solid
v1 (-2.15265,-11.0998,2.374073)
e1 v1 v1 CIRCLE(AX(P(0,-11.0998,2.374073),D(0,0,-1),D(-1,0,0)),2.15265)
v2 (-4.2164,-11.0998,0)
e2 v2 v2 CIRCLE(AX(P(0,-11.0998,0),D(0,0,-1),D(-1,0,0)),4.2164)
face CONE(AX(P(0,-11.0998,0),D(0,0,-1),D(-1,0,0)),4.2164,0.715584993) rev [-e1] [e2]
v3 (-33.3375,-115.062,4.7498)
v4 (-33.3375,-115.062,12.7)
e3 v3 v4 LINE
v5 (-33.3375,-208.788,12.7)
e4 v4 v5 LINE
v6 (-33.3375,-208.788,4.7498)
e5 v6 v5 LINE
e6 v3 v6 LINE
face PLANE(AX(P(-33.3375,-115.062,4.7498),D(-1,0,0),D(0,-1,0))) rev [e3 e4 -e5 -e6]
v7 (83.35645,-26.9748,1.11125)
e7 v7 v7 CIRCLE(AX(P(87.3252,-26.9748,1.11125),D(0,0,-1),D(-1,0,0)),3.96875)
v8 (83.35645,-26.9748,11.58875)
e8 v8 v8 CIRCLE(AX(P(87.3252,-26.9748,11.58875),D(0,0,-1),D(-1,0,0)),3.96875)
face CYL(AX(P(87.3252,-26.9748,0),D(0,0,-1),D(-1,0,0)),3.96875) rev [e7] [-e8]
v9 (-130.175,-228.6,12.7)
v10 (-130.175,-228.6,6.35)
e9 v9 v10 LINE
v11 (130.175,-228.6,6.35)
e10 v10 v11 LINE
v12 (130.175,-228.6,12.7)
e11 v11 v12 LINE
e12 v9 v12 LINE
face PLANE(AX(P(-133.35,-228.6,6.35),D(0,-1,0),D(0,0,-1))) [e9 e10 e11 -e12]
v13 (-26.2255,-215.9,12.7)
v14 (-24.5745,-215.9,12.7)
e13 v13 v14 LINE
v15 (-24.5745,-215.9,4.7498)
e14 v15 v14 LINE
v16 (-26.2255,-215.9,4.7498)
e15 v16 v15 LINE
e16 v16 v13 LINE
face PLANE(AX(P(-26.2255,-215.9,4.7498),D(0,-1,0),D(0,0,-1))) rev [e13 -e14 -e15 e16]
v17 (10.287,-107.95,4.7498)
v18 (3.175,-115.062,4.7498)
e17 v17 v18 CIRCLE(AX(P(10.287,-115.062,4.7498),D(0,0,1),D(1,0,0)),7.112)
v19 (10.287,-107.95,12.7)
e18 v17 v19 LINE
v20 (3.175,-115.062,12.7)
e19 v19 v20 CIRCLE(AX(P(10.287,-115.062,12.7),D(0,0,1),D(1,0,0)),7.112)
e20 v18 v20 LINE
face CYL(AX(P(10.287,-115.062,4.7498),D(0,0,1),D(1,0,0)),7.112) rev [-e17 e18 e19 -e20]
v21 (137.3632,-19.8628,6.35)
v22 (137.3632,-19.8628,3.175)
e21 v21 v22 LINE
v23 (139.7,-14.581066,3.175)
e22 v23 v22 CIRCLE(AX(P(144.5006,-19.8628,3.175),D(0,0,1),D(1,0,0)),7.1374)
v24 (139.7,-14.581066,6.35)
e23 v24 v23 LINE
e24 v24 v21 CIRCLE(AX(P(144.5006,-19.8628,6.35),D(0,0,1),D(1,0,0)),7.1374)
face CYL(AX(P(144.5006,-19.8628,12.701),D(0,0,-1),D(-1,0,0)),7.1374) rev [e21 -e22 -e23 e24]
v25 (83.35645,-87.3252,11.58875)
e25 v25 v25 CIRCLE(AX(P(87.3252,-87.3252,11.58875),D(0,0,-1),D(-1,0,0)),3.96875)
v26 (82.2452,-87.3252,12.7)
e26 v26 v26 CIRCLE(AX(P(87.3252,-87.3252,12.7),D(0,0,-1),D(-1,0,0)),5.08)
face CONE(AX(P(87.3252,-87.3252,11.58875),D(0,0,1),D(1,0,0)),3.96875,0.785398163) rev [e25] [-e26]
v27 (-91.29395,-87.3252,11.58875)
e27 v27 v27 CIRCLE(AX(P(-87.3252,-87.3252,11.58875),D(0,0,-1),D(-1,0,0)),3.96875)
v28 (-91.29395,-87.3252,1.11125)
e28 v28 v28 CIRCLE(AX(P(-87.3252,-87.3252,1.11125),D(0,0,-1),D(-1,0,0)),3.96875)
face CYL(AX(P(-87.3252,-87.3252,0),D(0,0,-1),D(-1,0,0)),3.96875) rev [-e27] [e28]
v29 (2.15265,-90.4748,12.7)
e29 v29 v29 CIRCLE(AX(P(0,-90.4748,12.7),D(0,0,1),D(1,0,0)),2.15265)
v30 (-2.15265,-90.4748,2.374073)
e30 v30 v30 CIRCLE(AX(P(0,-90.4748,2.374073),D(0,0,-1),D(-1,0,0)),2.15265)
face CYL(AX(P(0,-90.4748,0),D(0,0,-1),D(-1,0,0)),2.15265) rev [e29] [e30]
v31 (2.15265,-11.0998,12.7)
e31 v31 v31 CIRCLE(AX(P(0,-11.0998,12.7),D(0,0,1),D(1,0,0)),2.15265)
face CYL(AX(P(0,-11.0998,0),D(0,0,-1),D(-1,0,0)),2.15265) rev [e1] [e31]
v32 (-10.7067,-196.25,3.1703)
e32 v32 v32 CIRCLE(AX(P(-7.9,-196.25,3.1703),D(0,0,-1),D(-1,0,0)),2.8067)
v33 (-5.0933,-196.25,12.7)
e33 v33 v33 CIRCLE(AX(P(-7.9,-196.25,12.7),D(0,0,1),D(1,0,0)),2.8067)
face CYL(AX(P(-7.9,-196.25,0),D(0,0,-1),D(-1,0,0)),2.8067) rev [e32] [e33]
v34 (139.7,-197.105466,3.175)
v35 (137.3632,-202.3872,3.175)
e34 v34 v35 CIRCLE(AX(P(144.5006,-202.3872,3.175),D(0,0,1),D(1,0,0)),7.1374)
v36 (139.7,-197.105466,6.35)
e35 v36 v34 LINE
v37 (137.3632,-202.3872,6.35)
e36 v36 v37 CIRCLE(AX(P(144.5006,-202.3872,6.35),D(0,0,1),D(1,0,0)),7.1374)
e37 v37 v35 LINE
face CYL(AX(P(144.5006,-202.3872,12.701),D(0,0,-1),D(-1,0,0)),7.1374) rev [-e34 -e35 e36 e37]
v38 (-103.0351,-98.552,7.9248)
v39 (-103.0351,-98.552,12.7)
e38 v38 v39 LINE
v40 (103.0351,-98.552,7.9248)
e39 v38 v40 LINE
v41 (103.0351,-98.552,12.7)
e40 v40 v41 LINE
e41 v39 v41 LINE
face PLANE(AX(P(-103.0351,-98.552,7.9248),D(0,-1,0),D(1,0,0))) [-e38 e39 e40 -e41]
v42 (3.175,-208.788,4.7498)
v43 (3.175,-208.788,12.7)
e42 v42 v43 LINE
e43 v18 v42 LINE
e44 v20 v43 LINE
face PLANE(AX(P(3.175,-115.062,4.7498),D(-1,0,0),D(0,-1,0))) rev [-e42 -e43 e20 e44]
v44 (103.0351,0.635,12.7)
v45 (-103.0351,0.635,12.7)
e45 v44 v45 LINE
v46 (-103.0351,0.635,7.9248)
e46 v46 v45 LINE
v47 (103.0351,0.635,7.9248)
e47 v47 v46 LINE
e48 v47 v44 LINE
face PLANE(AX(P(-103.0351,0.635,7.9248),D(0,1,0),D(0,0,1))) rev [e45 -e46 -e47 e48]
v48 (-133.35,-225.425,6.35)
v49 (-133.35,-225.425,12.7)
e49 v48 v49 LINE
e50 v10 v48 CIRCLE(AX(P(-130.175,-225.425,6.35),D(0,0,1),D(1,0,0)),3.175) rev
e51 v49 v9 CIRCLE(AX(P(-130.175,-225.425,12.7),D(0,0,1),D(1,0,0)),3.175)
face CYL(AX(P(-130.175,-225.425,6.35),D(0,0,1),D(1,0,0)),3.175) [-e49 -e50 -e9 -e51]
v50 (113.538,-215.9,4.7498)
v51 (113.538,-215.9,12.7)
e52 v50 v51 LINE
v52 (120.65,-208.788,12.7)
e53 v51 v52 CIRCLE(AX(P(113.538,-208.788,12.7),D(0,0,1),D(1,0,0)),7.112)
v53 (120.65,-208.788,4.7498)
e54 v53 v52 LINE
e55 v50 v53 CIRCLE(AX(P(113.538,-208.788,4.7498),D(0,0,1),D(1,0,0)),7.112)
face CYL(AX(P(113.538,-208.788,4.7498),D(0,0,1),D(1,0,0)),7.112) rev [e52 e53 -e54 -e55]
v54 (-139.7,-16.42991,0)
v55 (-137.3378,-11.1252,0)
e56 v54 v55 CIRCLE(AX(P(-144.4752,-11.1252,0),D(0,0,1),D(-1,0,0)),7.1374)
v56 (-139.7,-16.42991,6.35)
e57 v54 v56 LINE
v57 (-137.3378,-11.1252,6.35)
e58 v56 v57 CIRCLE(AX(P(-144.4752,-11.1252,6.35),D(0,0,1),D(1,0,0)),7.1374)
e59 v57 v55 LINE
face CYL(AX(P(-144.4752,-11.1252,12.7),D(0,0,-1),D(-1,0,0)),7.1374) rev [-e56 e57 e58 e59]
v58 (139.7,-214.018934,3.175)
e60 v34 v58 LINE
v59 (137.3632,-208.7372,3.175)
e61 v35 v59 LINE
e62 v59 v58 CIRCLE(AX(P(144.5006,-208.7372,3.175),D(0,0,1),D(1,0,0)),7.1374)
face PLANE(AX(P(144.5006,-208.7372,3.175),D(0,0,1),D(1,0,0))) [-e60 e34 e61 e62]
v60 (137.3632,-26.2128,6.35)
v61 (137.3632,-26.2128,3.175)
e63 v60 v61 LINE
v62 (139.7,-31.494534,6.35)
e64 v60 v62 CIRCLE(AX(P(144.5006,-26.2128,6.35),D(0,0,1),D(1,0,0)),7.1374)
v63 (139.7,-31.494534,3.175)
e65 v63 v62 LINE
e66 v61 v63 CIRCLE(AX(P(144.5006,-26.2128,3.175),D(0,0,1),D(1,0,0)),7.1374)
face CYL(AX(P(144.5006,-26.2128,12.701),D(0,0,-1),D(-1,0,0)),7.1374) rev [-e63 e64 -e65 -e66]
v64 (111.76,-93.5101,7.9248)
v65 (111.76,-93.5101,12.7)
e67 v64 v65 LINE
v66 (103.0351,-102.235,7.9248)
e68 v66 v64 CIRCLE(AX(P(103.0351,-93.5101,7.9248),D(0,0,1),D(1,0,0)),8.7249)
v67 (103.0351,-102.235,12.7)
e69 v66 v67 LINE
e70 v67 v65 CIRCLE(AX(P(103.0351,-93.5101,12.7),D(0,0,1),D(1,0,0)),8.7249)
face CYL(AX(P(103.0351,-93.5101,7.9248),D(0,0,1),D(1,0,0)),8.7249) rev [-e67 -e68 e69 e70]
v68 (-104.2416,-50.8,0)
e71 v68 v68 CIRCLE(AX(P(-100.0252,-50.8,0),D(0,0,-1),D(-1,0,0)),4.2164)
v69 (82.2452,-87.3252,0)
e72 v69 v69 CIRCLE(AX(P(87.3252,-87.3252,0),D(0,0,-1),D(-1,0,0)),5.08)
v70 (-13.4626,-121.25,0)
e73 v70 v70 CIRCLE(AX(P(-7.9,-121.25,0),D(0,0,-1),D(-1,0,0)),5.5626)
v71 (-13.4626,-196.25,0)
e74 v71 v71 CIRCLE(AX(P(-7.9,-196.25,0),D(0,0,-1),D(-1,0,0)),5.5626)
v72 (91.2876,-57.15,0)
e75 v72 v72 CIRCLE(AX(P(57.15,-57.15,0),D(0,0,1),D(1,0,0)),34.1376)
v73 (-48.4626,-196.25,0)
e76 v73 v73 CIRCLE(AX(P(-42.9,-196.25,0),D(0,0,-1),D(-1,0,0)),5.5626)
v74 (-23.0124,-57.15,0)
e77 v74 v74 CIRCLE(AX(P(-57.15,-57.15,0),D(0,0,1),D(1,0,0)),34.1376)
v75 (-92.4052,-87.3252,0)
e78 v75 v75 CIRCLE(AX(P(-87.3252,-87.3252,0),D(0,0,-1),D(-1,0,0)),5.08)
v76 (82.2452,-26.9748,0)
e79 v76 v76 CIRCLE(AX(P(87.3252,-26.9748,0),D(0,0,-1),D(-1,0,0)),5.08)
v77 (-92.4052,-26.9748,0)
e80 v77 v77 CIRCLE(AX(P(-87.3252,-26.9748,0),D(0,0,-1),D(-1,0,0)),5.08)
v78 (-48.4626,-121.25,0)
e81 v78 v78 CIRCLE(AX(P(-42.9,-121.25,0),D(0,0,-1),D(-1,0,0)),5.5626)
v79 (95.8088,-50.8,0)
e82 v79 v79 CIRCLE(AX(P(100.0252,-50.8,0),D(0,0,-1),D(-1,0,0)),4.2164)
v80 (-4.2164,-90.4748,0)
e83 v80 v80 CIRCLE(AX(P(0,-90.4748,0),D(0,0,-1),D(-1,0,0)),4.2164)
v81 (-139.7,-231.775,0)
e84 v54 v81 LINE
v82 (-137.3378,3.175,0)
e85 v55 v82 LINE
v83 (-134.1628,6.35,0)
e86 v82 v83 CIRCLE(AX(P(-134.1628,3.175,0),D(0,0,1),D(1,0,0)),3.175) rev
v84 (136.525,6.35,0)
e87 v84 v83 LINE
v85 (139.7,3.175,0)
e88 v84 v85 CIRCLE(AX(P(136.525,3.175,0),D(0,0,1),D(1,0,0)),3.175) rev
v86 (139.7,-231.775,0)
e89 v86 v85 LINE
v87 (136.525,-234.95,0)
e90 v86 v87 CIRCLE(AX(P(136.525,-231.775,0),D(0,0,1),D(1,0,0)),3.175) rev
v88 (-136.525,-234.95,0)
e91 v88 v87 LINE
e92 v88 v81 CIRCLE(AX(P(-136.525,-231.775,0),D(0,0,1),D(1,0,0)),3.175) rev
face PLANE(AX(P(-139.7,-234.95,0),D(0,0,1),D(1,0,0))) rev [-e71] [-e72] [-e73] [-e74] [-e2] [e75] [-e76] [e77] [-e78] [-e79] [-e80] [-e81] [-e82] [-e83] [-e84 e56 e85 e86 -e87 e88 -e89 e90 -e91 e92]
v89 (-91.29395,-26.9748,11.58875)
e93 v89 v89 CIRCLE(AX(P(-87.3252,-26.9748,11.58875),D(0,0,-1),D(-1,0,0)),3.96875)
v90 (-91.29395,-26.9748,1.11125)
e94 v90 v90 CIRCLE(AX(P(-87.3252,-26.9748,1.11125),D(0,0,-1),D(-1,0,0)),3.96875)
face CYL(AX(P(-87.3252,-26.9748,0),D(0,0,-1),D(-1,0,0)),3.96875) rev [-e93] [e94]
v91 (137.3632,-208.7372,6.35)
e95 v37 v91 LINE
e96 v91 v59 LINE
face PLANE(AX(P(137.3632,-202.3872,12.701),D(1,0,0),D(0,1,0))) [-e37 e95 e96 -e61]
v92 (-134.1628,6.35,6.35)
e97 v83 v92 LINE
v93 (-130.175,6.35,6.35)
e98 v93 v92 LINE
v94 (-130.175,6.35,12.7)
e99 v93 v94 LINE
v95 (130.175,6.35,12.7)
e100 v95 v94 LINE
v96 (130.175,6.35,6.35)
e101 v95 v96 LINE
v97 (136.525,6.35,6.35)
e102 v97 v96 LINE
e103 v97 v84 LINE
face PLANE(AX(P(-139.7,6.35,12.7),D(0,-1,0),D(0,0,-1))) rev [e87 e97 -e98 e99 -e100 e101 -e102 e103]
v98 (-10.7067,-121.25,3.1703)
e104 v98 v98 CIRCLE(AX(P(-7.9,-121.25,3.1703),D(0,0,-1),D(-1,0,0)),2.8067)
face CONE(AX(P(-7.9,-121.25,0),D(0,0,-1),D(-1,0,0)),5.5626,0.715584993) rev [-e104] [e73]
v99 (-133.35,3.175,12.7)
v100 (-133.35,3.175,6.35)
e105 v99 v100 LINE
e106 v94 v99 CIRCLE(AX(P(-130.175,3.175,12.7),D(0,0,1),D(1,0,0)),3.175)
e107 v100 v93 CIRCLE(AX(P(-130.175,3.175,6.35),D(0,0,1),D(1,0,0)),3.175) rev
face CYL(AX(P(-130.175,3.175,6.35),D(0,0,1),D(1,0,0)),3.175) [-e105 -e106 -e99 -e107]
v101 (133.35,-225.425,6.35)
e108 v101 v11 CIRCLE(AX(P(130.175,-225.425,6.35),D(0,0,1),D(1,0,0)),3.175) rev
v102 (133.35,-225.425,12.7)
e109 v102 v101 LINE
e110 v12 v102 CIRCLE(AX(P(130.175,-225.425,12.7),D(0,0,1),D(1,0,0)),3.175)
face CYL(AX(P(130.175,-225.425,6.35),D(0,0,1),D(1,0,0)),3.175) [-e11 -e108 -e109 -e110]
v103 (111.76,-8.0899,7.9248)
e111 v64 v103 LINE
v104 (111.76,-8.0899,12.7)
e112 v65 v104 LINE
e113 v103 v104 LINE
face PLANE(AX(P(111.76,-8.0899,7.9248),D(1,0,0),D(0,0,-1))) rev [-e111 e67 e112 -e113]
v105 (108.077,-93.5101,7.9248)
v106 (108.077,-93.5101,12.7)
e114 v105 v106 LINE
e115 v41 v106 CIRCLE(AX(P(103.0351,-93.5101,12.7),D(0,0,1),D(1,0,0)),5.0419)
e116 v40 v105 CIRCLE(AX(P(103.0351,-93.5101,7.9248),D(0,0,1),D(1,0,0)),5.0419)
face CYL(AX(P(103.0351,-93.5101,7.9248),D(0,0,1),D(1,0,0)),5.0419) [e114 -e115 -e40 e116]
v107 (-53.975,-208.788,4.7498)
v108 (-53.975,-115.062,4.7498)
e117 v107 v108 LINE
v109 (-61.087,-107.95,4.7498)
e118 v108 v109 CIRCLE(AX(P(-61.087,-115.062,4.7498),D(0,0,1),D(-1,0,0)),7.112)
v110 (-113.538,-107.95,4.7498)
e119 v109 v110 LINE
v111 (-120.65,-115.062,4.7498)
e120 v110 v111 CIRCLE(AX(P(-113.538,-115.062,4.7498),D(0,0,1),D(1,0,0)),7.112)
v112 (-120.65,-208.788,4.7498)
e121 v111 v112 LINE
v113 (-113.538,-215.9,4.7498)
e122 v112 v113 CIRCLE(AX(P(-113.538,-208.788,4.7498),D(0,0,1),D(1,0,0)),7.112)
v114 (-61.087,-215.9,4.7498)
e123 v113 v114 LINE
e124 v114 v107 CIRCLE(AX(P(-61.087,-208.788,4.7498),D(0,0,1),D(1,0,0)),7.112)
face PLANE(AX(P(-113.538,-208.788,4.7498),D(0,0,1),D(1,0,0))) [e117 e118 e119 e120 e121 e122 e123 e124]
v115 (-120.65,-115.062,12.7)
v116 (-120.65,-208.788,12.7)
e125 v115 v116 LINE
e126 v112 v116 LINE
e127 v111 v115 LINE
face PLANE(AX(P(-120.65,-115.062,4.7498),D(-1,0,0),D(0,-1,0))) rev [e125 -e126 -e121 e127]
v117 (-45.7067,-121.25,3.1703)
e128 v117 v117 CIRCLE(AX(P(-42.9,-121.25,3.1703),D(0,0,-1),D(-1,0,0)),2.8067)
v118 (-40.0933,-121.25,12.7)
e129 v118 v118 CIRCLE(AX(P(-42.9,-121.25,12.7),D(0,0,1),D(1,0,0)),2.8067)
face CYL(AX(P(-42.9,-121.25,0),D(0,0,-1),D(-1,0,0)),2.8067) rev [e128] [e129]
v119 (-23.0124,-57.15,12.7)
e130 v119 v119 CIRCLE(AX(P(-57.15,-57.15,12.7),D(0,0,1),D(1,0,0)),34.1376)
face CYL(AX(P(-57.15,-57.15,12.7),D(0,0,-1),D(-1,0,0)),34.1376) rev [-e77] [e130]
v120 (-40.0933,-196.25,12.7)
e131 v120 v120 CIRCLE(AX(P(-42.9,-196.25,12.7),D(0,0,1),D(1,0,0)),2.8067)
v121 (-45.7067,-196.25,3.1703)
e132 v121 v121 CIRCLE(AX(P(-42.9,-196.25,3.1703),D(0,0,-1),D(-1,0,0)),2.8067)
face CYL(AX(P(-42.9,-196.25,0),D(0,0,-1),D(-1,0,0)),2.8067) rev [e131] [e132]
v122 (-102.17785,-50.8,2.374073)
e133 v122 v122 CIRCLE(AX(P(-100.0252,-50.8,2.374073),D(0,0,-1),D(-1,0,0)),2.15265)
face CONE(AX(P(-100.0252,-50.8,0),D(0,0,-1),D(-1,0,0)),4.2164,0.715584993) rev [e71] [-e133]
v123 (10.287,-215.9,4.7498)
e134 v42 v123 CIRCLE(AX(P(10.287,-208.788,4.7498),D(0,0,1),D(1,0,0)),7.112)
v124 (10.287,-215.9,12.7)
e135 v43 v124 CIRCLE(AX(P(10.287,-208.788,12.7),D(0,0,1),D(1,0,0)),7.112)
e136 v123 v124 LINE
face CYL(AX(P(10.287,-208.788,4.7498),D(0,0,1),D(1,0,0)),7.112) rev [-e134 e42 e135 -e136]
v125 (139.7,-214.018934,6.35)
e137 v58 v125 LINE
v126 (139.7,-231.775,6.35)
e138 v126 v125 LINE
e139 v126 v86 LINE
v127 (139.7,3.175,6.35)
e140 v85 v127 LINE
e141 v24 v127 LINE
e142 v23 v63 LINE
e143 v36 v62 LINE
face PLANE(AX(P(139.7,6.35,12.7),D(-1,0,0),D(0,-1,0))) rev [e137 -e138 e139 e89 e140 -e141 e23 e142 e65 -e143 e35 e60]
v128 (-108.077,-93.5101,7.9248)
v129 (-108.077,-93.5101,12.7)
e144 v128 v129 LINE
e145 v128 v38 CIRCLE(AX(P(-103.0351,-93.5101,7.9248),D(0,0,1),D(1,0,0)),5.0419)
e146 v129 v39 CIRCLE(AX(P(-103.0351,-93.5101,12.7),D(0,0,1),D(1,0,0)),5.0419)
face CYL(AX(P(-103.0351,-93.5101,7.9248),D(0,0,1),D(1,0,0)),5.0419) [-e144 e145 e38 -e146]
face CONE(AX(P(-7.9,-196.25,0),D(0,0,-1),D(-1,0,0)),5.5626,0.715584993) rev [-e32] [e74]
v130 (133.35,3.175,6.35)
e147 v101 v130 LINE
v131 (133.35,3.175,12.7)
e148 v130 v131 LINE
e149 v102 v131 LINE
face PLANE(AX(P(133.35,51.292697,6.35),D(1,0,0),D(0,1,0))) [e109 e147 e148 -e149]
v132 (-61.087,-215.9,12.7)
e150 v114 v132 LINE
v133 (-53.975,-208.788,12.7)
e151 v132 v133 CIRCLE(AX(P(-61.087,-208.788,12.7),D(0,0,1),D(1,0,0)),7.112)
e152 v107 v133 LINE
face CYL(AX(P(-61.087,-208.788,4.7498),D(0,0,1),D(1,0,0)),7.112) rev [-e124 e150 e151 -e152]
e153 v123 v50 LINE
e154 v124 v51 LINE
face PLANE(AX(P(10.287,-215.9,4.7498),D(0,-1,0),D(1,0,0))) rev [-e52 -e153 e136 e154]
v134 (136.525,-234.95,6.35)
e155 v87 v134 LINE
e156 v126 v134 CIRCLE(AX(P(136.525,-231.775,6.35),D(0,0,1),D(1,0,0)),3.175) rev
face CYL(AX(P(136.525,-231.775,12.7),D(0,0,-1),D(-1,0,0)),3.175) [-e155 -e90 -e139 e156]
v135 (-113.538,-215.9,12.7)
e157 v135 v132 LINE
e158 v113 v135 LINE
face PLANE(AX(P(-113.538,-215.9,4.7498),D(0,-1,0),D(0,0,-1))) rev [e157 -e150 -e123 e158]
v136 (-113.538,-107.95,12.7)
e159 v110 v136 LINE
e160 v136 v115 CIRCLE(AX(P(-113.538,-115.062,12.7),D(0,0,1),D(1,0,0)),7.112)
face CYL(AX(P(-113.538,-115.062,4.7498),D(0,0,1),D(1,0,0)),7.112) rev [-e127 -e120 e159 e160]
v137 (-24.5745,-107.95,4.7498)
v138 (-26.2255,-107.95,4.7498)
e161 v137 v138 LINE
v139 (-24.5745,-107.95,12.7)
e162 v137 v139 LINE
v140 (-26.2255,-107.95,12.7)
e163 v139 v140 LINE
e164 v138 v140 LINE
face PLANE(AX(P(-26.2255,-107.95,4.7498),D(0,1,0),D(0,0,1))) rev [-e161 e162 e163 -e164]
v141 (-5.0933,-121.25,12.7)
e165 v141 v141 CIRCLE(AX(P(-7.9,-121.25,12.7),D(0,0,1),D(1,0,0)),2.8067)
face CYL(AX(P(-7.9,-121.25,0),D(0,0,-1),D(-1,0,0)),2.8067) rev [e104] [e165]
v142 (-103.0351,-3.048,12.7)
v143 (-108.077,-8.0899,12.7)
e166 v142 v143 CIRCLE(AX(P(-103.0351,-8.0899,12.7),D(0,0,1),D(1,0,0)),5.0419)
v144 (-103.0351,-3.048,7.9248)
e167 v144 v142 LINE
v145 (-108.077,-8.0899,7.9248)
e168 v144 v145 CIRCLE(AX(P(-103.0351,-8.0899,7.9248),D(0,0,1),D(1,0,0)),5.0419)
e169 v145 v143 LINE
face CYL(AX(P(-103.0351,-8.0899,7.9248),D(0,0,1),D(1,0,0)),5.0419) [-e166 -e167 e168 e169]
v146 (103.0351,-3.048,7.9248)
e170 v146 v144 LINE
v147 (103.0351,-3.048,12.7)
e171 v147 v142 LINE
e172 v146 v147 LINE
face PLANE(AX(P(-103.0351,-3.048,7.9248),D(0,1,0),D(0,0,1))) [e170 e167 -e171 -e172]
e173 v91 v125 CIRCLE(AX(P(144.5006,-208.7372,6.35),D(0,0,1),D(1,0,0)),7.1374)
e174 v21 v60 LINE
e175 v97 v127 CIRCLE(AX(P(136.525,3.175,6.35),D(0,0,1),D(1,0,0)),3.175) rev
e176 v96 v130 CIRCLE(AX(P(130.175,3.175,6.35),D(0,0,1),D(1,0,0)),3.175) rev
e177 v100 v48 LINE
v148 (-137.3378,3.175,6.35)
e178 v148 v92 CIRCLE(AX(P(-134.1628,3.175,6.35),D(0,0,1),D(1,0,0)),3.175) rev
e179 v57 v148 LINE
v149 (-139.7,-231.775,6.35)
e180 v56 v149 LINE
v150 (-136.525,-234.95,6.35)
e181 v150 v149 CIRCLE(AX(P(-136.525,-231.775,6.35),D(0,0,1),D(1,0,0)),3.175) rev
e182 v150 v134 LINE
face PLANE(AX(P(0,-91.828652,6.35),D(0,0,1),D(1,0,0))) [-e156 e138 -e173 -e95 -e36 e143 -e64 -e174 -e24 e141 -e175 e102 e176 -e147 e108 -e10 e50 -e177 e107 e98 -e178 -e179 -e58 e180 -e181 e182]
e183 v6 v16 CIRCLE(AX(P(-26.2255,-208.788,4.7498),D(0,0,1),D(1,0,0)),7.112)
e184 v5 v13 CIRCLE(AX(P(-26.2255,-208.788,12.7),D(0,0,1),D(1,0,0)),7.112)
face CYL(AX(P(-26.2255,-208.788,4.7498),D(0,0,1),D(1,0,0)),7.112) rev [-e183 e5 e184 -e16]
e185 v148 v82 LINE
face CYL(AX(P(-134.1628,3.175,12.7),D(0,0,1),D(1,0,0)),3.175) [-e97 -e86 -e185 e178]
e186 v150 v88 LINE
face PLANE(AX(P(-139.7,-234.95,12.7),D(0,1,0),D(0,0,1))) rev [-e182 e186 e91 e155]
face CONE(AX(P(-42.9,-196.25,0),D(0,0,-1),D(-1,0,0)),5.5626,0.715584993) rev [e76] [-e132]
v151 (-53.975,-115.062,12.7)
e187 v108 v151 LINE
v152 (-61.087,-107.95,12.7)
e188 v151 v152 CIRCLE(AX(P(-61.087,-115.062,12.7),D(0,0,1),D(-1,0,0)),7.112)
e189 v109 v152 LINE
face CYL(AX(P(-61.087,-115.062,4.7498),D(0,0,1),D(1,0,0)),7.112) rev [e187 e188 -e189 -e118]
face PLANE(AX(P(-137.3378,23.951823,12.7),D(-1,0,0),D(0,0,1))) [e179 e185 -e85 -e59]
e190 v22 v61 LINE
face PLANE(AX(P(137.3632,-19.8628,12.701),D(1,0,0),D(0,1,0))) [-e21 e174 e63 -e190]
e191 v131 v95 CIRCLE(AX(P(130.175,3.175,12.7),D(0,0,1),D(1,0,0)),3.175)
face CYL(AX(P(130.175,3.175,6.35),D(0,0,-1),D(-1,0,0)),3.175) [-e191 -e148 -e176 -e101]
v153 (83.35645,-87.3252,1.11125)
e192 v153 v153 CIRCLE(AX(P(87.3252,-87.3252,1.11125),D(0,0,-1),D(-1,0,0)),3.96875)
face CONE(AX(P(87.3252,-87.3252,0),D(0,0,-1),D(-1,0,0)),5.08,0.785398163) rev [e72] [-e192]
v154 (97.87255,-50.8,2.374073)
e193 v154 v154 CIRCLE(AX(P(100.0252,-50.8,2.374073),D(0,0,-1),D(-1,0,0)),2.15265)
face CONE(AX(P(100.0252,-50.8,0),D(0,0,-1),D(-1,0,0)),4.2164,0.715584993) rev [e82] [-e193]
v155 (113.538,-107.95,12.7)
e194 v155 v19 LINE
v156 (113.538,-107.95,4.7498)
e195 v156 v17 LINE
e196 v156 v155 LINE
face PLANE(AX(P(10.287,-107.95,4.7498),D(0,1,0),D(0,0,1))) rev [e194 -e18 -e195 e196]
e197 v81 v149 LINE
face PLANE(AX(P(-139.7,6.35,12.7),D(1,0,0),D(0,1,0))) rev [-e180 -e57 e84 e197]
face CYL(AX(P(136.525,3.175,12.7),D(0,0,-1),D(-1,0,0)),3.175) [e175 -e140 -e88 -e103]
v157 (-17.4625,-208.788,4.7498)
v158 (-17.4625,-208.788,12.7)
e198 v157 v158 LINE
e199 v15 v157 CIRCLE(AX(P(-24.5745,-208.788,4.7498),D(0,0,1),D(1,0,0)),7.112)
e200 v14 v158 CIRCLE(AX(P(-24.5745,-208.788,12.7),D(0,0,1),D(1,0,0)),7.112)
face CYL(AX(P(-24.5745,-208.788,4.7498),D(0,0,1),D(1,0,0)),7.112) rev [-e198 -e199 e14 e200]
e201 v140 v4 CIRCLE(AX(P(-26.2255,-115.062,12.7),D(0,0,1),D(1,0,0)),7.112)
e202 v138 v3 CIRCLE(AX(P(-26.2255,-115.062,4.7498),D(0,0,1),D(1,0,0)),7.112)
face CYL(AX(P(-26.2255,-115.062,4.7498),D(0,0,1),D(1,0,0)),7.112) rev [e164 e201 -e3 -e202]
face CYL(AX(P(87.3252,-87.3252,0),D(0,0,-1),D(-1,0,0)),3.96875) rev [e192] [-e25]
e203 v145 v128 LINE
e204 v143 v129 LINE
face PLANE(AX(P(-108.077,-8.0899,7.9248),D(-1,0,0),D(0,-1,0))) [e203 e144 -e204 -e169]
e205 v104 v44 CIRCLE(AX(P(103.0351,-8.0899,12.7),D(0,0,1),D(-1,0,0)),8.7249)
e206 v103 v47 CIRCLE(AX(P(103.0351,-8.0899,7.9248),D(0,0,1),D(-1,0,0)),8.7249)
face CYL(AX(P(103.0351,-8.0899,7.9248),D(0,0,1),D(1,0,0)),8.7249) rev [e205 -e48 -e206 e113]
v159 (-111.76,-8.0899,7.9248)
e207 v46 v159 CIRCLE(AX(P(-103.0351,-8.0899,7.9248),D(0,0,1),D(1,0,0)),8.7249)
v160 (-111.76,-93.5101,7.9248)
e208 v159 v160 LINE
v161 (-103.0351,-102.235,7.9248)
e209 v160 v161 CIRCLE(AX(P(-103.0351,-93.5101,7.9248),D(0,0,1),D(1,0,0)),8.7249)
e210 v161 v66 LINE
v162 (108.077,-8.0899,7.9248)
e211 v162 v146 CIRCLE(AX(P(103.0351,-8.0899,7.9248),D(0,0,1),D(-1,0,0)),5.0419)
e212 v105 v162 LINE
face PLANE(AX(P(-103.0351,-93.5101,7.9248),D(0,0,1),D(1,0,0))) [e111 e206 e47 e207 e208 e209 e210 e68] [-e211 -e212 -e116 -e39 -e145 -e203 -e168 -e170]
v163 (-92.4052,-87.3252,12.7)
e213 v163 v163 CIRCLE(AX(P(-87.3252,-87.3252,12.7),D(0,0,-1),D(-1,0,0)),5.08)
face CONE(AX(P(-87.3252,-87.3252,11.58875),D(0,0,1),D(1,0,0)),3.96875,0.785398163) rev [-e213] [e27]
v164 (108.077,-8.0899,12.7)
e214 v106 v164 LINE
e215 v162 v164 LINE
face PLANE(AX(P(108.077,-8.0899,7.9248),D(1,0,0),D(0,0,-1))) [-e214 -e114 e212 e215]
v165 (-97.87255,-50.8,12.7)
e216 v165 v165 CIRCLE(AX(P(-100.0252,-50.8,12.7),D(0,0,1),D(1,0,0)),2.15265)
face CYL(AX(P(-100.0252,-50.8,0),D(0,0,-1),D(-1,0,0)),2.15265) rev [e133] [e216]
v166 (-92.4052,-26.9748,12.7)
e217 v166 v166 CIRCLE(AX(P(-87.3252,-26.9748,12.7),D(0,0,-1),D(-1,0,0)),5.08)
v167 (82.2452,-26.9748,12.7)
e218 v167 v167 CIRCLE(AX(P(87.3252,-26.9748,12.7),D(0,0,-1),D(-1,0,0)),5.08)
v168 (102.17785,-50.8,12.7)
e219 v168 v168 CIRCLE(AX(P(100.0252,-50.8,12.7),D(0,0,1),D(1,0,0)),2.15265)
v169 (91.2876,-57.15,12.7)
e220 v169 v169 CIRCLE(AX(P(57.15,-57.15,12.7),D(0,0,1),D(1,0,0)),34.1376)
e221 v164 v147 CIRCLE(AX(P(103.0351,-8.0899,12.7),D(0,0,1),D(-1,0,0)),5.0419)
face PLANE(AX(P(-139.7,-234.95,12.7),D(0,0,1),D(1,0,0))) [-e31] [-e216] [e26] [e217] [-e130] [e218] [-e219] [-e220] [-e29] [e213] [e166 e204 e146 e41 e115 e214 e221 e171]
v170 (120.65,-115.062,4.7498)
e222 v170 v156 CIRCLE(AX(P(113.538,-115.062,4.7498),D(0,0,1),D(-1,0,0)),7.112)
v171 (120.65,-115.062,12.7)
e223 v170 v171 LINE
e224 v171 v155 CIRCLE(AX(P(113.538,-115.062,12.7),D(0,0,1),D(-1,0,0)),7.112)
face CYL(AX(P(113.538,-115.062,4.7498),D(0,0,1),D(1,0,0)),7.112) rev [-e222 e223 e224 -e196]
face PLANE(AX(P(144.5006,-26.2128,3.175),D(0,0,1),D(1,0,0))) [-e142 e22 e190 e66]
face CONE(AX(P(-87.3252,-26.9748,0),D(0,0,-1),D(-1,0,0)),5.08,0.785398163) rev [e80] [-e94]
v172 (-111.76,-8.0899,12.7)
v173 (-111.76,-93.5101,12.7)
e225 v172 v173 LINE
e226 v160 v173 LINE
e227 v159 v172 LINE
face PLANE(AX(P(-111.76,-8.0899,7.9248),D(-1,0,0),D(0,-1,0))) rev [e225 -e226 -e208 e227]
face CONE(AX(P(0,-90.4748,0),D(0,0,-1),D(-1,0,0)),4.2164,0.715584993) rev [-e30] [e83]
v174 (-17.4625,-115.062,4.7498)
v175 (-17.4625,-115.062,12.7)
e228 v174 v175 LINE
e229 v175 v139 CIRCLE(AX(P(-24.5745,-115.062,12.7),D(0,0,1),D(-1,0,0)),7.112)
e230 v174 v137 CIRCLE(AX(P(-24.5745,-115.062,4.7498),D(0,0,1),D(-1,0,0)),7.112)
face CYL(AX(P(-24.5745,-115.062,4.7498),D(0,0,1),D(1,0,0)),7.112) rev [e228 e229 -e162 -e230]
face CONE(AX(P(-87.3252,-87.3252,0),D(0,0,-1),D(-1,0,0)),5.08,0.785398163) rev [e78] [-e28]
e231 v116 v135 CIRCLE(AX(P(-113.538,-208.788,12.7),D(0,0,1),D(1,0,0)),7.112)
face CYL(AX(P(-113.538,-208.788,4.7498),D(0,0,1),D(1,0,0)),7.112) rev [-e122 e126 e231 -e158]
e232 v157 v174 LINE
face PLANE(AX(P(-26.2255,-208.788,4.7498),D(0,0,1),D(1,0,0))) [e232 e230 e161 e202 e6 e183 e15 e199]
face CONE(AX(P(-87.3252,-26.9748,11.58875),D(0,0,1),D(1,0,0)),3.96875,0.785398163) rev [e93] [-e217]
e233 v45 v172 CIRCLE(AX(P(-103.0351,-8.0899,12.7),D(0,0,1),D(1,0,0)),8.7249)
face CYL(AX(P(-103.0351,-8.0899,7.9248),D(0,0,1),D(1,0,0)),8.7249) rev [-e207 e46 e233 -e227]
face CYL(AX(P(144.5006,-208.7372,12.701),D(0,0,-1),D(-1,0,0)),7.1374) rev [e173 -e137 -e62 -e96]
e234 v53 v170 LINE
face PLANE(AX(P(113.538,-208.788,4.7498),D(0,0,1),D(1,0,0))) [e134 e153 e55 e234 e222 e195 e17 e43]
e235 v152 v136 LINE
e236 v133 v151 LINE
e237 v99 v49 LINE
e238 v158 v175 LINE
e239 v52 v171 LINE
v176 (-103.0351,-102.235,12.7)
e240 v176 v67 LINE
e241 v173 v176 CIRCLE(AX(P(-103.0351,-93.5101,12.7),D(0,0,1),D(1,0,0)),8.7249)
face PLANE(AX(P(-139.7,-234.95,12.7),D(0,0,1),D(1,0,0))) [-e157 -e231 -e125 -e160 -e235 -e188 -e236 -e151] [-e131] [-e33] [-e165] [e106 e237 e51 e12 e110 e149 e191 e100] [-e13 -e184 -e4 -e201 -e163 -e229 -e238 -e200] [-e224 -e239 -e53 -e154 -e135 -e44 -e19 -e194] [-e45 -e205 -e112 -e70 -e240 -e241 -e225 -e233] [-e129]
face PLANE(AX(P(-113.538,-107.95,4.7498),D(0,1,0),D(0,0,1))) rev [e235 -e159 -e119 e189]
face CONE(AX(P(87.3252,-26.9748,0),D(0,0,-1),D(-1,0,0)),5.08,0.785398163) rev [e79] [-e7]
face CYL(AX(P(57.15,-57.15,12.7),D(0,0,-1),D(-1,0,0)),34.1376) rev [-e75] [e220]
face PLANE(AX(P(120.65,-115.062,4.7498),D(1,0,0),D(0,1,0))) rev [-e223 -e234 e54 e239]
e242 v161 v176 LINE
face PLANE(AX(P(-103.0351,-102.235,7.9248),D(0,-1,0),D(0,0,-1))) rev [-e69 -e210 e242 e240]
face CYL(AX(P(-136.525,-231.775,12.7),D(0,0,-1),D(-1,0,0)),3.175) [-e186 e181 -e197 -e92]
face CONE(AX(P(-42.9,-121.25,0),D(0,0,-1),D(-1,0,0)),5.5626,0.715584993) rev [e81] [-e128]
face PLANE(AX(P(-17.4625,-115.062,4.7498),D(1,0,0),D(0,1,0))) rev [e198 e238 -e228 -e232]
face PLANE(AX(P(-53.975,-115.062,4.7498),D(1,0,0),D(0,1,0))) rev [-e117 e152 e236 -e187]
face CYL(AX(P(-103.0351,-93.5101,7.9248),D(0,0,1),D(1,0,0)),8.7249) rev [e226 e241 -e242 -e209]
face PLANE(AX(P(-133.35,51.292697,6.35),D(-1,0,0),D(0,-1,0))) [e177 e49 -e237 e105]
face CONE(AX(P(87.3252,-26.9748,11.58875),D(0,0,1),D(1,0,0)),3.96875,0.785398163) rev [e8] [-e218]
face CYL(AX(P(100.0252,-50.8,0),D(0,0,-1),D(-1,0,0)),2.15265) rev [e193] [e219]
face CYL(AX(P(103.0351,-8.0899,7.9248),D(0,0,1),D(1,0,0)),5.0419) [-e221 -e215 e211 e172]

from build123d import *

# Parameters (mm, degrees)
SKETCH1_W                                       = 279.4
SKETCH1_H                                       = 241.3
BOSS_EXTRUDE1_DEPTH                             = 12.7
SKETCH2_R                                       = 34.1376
CUT_EXTRUDE1_DEPTH                              = 274.640060115
F_3_8_16_TAPPED_HOLE1_AT_2_COUNT                = 2
F_3_8_16_TAPPED_HOLE1_AT_2_PITCH                = 60.3504
F_3_8_16_TAPPED_HOLE1_AT_3_COUNT                = 2
F_3_8_16_TAPPED_HOLE1_AT_3_PITCH                = 184.783475994
F_3_8_16_TAPPED_HOLE1_AT_4_COUNT                = 2
F_3_8_16_TAPPED_HOLE1_AT_4_PITCH                = 174.6504
CSK_FOR_12_FLAT_HEAD_MACHINE_SCREW1_D           = 5.6134
CSK_FOR_12_FLAT_HEAD_MACHINE_SCREW1_CSINK_D     = 11.1252
CSK_FOR_12_FLAT_HEAD_MACHINE_SCREW1_CSINK_ANGLE = 82
CUT_EXTRUDE2_DEPTH                              = 7.9502
CUT_EXTRUDE3_DEPTH                              = 4.7752
CSK_FOR_8_FLAT_HEAD_MACHINE_SCREW1_D            = 4.3053
CSK_FOR_8_FLAT_HEAD_MACHINE_SCREW1_CSINK_D      = 8.4328
CSK_FOR_8_FLAT_HEAD_MACHINE_SCREW1_CSINK_ANGLE  = 82
CUT_EXTRUDE4_DEPTH                              = 274.640060115
FILLET1_R                                       = 3.175
CUT_EXTRUDE5_START                              = -6.35
CUT_EXTRUDE5_DEPTH                              = 6.35
FILLET2_R                                       = 3.175
CUT_EXTRUDE6_REACH                              = 278.815
CUT_EXTRUDE6_START                              = 3.175


# Read off the part's stored shape, not the designer's step: Cut-Extrude5
with BuildPart() as part:
    # Sketch1 → Boss-Extrude1 (new body)
    with BuildSketch(Plane.XY):
        with Locations((0, -114.3)):
            Rectangle(SKETCH1_W, SKETCH1_H)
    extrude(amount=BOSS_EXTRUDE1_DEPTH)

    # Sketch2 → Cut-Extrude1 (cut, through all)
    with BuildSketch(Plane.XY):
        with Locations((-57.15, -57.15)):
            Circle(SKETCH2_R)
        with Locations((57.15, -57.15)):
            Circle(SKETCH2_R)
    extrude(amount=CUT_EXTRUDE1_DEPTH, mode=Mode.SUBTRACT)

    # Sketch3 → 3/8-16 Tapped Hole1 (revolve, cut)
    with BuildSketch(Plane(origin=(87.3252, -26.9748, 0), x_dir=(0, 1, 0), z_dir=(1, 0, 0))):
        Polygon((0, 0), (0, 12.7), (5.08, 12.7), (3.96875, 11.58875), (3.96875, 1.11125), (5.08, 0), align=None)
    f_3_8_16_tapped_hole1 = revolve(axis=Axis((87.3252, -26.9748, -6.35), (0, 0, 1)), mode=Mode.SUBTRACT)

    # 3/8-16 Tapped Hole1 at 2: 3/8-16 Tapped Hole1 ×2
    with Locations(*[(0, -i * F_3_8_16_TAPPED_HOLE1_AT_2_PITCH, 0) for i in range(1, F_3_8_16_TAPPED_HOLE1_AT_2_COUNT)]):
        add(f_3_8_16_tapped_hole1, mode=Mode.SUBTRACT)

    # 3/8-16 Tapped Hole1 at 3: 3/8-16 Tapped Hole1 ×2
    with Locations(*[Vector(-0.9451624343615008, -0.3266006317688955, 0) * (i * F_3_8_16_TAPPED_HOLE1_AT_3_PITCH) for i in range(1, F_3_8_16_TAPPED_HOLE1_AT_3_COUNT)]):
        add(f_3_8_16_tapped_hole1, mode=Mode.SUBTRACT)

    # 3/8-16 Tapped Hole1 at 4: 3/8-16 Tapped Hole1 ×2
    with Locations(*[(-i * F_3_8_16_TAPPED_HOLE1_AT_4_PITCH, 0, 0) for i in range(1, F_3_8_16_TAPPED_HOLE1_AT_4_COUNT)]):
        add(f_3_8_16_tapped_hole1, mode=Mode.SUBTRACT)

    # CSK for #12 Flat Head Machine Screw1 (through all)
    with Locations(Plane(origin=(0, 0, 0), x_dir=(-1, 0, 0), z_dir=(0, 0, -1))):
        with Locations((42.9, -121.25), (7.9, -121.25), (7.9, -196.25), (42.9, -196.25)):
            CounterSinkHole(CSK_FOR_12_FLAT_HEAD_MACHINE_SCREW1_D / 2, CSK_FOR_12_FLAT_HEAD_MACHINE_SCREW1_CSINK_D / 2, counter_sink_angle=CSK_FOR_12_FLAT_HEAD_MACHINE_SCREW1_CSINK_ANGLE)

    # Sketch8 → Cut-Extrude2 (cut)
    with BuildSketch(Plane.XY.offset(12.7)):
        with BuildLine():
            Line((-113.538, -107.95), (-61.087, -107.95))
            ThreePointArc((-61.087, -107.95), (-56.058056572, -110.033056572), (-53.975, -115.062))
            Line((-53.975, -115.062), (-53.975, -208.788))
            ThreePointArc((-53.975, -208.788), (-56.058056572, -213.816943428), (-61.087, -215.9))
            Line((-61.087, -215.9), (-113.538, -215.9))
            ThreePointArc((-113.538, -215.9), (-118.566943428, -213.816943428), (-120.65, -208.788))
            Line((-120.65, -208.788), (-120.65, -115.062))
            ThreePointArc((-120.65, -115.062), (-118.566943428, -110.033056572), (-113.538, -107.95))
        make_face()
        with BuildLine():
            Line((10.287, -107.95), (113.538, -107.95))
            ThreePointArc((113.538, -107.95), (118.566943428, -110.033056572), (120.65, -115.062))
            Line((120.65, -115.062), (120.65, -208.788))
            ThreePointArc((120.65, -208.788), (118.566943428, -213.816943428), (113.538, -215.9))
            Line((113.538, -215.9), (10.287, -215.9))
            ThreePointArc((10.287, -215.9), (5.258056572, -213.816943428), (3.175, -208.788))
            Line((3.175, -208.788), (3.175, -115.062))
            ThreePointArc((3.175, -115.062), (5.258056572, -110.033056572), (10.287, -107.95))
        make_face()
        with BuildLine():
            Line((-26.2255, -107.95), (-24.5745, -107.95))
            ThreePointArc((-24.5745, -107.95), (-19.545556572, -110.033056572), (-17.4625, -115.062))
            Line((-17.4625, -115.062), (-17.4625, -208.788))
            ThreePointArc((-17.4625, -208.788), (-19.545556572, -213.816943428), (-24.5745, -215.9))
            Line((-24.5745, -215.9), (-26.2255, -215.9))
            ThreePointArc((-26.2255, -215.9), (-31.254443428, -213.816943428), (-33.3375, -208.788))
            Line((-33.3375, -208.788), (-33.3375, -115.062))
            ThreePointArc((-33.3375, -115.062), (-31.254443428, -110.033056572), (-26.2255, -107.95))
        make_face()
    extrude(amount=-CUT_EXTRUDE2_DEPTH, mode=Mode.SUBTRACT)

    # Sketch9 → Cut-Extrude3 (cut)
    with BuildSketch(Plane.XY.offset(12.7)):
        with BuildLine():
            Line((-103.0351, 0.635), (103.0351, 0.635))
            ThreePointArc((103.0351, 0.635), (109.204535955, -1.920464045), (111.76, -8.0899))
            Line((111.76, -8.0899), (111.76, -93.5101))
            ThreePointArc((111.76, -93.5101), (109.204535955, -99.679535955), (103.0351, -102.235))
            Line((103.0351, -102.235), (-103.0351, -102.235))
            ThreePointArc((-103.0351, -102.235), (-109.204535955, -99.679535955), (-111.76, -93.5101))
            Line((-111.76, -93.5101), (-111.76, -8.0899))
            ThreePointArc((-111.76, -8.0899), (-109.204535955, -1.920464045), (-103.0351, 0.635))
        make_face()
        with BuildLine():
            Line((108.077, -8.0899), (108.077, -93.5101))
            ThreePointArc((108.077, -93.5101), (106.60026168, -97.07526168), (103.0351, -98.552))
            Line((103.0351, -98.552), (-103.0351, -98.552))
            ThreePointArc((-103.0351, -98.552), (-106.60026168, -97.07526168), (-108.077, -93.5101))
            Line((-108.077, -93.5101), (-108.077, -8.0899))
            ThreePointArc((-108.077, -8.0899), (-106.60026168, -4.52473832), (-103.0351, -3.048))
            Line((-103.0351, -3.048), (103.0351, -3.048))
            ThreePointArc((103.0351, -3.048), (106.60026168, -4.52473832), (108.077, -8.0899))
        make_face(mode=Mode.SUBTRACT)
    extrude(amount=-CUT_EXTRUDE3_DEPTH, mode=Mode.SUBTRACT)

    # CSK for #8 Flat Head Machine Screw1 (through all)
    with Locations(Plane(origin=(0, 0, 0), x_dir=(-1, 0, 0), z_dir=(0, 0, -1))):
        with Locations((100.0252, -50.8), (0, -11.0998), (-100.0252, -50.8), (0, -90.4748)):
            CounterSinkHole(CSK_FOR_8_FLAT_HEAD_MACHINE_SCREW1_D / 2, CSK_FOR_8_FLAT_HEAD_MACHINE_SCREW1_CSINK_D / 2, counter_sink_angle=CSK_FOR_8_FLAT_HEAD_MACHINE_SCREW1_CSINK_ANGLE)

    # Sketch12 → Cut-Extrude4 (cut, through all)
    with BuildSketch(Plane.XY):
        with BuildLine():
            Line((-137.3378, 23.951822796), (-137.3378, -11.1252))
            ThreePointArc((-137.3378, -11.1252), (-139.42829606, -16.17210394), (-144.4752, -18.2626))
            Line((-144.4752, -18.2626), (-144.4752, 23.951822796))
            Line((-144.4752, 23.951822796), (-137.3378, 23.951822796))
        make_face()
    extrude(amount=CUT_EXTRUDE4_DEPTH, mode=Mode.SUBTRACT)

    # Fillet1
    fillet1_edges = [part.edges().sort_by_distance(p)[0] for p in [
        (-137.3378, 6.35, 6.35),
        (139.7, 6.35, 6.35),
        (139.7, -234.95, 6.35),
        (-139.7, -234.95, 6.35),
    ]]
    fillet(fillet1_edges, radius=FILLET1_R)

    # Cut-Extrude5 outline → Cut-Extrude5 (cut)
    with BuildSketch(Plane.XY.offset(12.7).offset(CUT_EXTRUDE5_START)):
        with BuildLine():
            Line((-133.35, -228.6), (-133.35, 6.35))
            Line((-133.35, 6.35), (-134.1628, 6.35))
            ThreePointArc((-134.1628, 6.35), (-136.40786403, 5.42006403), (-137.3378, 3.175))
            Line((-137.3378, 3.175), (-137.3378, -11.1252))
            ThreePointArc((-137.3378, -11.1252), (-137.955039295, -14.028643325), (-139.7, -16.429909579))
            Line((-139.7, -16.429909579), (-139.7, -231.775))
            ThreePointArc((-139.7, -231.775), (-138.77006403, -234.02006403), (-136.525, -234.95))
            Line((-136.525, -234.95), (136.525, -234.95))
            ThreePointArc((136.525, -234.95), (138.77006403, -234.02006403), (139.7, -231.775))
            Line((139.7, -231.775), (139.7, 3.175))
            ThreePointArc((139.7, 3.175), (138.77006403, 5.42006403), (136.525, 6.35))
            Line((136.525, 6.35), (133.35, 6.35))
            Line((133.35, 6.35), (133.35, -228.6))
            Line((133.35, -228.6), (-133.35, -228.6))
        make_face()
    extrude(amount=CUT_EXTRUDE5_DEPTH, mode=Mode.SUBTRACT)

    # Fillet2
    fillet2_edges = [part.edges().sort_by_distance(p)[0] for p in [
        (133.35, 6.35, 9.525),
        (-133.35, 6.35, 9.525),
        (133.35, -228.6, 9.525),
        (-133.35, -228.6, 9.525),
    ]]
    fillet(fillet2_edges, radius=FILLET2_R)

    # Sketch14 → Cut-Extrude6 (cut, up to next)
    with BuildSketch(Plane.XY.offset(CUT_EXTRUDE6_START), mode=Mode.PRIVATE) as cut_extrude6_sk1:
        with BuildLine():
            Line((144.5006, -12.7254), (162.7632, -12.7254))
            Line((162.7632, -12.7254), (162.7632, -33.3502))
            Line((162.7632, -33.3502), (144.5006, -33.3502))
            ThreePointArc((144.5006, -33.3502), (139.45369606, -31.25970394), (137.3632, -26.2128))
            Line((137.3632, -26.2128), (137.3632, -19.8628))
            ThreePointArc((137.3632, -19.8628), (139.45369606, -14.81589606), (144.5006, -12.7254))
        make_face()
    cut_extrude6_tool1 = extrude(cut_extrude6_sk1.sketch, amount=CUT_EXTRUDE6_REACH, mode=Mode.PRIVATE) & part.part
    # Sketch14 → Cut-Extrude6 (cut, up to next)
    with BuildSketch(Plane.XY.offset(CUT_EXTRUDE6_START), mode=Mode.PRIVATE) as cut_extrude6_sk2:
        with BuildLine():
            Line((144.5006, -195.2498), (162.7632, -195.2498))
            Line((162.7632, -195.2498), (162.7632, -215.8746))
            Line((162.7632, -215.8746), (144.5006, -215.8746))
            ThreePointArc((144.5006, -215.8746), (139.45369606, -213.78410394), (137.3632, -208.7372))
            Line((137.3632, -208.7372), (137.3632, -202.3872))
            ThreePointArc((137.3632, -202.3872), (139.45369606, -197.34029606), (144.5006, -195.2498))
        make_face()
    cut_extrude6_tool2 = extrude(cut_extrude6_sk2.sketch, amount=CUT_EXTRUDE6_REACH, mode=Mode.PRIVATE) & part.part
    add(cut_extrude6_tool1.solids().sort_by_distance((150.546907, -23.0378, 3.175))[0], mode=Mode.SUBTRACT)
    add(cut_extrude6_tool2.solids().sort_by_distance((150.546907, -205.5622, 3.175))[0], mode=Mode.SUBTRACT)


solid = part.part
